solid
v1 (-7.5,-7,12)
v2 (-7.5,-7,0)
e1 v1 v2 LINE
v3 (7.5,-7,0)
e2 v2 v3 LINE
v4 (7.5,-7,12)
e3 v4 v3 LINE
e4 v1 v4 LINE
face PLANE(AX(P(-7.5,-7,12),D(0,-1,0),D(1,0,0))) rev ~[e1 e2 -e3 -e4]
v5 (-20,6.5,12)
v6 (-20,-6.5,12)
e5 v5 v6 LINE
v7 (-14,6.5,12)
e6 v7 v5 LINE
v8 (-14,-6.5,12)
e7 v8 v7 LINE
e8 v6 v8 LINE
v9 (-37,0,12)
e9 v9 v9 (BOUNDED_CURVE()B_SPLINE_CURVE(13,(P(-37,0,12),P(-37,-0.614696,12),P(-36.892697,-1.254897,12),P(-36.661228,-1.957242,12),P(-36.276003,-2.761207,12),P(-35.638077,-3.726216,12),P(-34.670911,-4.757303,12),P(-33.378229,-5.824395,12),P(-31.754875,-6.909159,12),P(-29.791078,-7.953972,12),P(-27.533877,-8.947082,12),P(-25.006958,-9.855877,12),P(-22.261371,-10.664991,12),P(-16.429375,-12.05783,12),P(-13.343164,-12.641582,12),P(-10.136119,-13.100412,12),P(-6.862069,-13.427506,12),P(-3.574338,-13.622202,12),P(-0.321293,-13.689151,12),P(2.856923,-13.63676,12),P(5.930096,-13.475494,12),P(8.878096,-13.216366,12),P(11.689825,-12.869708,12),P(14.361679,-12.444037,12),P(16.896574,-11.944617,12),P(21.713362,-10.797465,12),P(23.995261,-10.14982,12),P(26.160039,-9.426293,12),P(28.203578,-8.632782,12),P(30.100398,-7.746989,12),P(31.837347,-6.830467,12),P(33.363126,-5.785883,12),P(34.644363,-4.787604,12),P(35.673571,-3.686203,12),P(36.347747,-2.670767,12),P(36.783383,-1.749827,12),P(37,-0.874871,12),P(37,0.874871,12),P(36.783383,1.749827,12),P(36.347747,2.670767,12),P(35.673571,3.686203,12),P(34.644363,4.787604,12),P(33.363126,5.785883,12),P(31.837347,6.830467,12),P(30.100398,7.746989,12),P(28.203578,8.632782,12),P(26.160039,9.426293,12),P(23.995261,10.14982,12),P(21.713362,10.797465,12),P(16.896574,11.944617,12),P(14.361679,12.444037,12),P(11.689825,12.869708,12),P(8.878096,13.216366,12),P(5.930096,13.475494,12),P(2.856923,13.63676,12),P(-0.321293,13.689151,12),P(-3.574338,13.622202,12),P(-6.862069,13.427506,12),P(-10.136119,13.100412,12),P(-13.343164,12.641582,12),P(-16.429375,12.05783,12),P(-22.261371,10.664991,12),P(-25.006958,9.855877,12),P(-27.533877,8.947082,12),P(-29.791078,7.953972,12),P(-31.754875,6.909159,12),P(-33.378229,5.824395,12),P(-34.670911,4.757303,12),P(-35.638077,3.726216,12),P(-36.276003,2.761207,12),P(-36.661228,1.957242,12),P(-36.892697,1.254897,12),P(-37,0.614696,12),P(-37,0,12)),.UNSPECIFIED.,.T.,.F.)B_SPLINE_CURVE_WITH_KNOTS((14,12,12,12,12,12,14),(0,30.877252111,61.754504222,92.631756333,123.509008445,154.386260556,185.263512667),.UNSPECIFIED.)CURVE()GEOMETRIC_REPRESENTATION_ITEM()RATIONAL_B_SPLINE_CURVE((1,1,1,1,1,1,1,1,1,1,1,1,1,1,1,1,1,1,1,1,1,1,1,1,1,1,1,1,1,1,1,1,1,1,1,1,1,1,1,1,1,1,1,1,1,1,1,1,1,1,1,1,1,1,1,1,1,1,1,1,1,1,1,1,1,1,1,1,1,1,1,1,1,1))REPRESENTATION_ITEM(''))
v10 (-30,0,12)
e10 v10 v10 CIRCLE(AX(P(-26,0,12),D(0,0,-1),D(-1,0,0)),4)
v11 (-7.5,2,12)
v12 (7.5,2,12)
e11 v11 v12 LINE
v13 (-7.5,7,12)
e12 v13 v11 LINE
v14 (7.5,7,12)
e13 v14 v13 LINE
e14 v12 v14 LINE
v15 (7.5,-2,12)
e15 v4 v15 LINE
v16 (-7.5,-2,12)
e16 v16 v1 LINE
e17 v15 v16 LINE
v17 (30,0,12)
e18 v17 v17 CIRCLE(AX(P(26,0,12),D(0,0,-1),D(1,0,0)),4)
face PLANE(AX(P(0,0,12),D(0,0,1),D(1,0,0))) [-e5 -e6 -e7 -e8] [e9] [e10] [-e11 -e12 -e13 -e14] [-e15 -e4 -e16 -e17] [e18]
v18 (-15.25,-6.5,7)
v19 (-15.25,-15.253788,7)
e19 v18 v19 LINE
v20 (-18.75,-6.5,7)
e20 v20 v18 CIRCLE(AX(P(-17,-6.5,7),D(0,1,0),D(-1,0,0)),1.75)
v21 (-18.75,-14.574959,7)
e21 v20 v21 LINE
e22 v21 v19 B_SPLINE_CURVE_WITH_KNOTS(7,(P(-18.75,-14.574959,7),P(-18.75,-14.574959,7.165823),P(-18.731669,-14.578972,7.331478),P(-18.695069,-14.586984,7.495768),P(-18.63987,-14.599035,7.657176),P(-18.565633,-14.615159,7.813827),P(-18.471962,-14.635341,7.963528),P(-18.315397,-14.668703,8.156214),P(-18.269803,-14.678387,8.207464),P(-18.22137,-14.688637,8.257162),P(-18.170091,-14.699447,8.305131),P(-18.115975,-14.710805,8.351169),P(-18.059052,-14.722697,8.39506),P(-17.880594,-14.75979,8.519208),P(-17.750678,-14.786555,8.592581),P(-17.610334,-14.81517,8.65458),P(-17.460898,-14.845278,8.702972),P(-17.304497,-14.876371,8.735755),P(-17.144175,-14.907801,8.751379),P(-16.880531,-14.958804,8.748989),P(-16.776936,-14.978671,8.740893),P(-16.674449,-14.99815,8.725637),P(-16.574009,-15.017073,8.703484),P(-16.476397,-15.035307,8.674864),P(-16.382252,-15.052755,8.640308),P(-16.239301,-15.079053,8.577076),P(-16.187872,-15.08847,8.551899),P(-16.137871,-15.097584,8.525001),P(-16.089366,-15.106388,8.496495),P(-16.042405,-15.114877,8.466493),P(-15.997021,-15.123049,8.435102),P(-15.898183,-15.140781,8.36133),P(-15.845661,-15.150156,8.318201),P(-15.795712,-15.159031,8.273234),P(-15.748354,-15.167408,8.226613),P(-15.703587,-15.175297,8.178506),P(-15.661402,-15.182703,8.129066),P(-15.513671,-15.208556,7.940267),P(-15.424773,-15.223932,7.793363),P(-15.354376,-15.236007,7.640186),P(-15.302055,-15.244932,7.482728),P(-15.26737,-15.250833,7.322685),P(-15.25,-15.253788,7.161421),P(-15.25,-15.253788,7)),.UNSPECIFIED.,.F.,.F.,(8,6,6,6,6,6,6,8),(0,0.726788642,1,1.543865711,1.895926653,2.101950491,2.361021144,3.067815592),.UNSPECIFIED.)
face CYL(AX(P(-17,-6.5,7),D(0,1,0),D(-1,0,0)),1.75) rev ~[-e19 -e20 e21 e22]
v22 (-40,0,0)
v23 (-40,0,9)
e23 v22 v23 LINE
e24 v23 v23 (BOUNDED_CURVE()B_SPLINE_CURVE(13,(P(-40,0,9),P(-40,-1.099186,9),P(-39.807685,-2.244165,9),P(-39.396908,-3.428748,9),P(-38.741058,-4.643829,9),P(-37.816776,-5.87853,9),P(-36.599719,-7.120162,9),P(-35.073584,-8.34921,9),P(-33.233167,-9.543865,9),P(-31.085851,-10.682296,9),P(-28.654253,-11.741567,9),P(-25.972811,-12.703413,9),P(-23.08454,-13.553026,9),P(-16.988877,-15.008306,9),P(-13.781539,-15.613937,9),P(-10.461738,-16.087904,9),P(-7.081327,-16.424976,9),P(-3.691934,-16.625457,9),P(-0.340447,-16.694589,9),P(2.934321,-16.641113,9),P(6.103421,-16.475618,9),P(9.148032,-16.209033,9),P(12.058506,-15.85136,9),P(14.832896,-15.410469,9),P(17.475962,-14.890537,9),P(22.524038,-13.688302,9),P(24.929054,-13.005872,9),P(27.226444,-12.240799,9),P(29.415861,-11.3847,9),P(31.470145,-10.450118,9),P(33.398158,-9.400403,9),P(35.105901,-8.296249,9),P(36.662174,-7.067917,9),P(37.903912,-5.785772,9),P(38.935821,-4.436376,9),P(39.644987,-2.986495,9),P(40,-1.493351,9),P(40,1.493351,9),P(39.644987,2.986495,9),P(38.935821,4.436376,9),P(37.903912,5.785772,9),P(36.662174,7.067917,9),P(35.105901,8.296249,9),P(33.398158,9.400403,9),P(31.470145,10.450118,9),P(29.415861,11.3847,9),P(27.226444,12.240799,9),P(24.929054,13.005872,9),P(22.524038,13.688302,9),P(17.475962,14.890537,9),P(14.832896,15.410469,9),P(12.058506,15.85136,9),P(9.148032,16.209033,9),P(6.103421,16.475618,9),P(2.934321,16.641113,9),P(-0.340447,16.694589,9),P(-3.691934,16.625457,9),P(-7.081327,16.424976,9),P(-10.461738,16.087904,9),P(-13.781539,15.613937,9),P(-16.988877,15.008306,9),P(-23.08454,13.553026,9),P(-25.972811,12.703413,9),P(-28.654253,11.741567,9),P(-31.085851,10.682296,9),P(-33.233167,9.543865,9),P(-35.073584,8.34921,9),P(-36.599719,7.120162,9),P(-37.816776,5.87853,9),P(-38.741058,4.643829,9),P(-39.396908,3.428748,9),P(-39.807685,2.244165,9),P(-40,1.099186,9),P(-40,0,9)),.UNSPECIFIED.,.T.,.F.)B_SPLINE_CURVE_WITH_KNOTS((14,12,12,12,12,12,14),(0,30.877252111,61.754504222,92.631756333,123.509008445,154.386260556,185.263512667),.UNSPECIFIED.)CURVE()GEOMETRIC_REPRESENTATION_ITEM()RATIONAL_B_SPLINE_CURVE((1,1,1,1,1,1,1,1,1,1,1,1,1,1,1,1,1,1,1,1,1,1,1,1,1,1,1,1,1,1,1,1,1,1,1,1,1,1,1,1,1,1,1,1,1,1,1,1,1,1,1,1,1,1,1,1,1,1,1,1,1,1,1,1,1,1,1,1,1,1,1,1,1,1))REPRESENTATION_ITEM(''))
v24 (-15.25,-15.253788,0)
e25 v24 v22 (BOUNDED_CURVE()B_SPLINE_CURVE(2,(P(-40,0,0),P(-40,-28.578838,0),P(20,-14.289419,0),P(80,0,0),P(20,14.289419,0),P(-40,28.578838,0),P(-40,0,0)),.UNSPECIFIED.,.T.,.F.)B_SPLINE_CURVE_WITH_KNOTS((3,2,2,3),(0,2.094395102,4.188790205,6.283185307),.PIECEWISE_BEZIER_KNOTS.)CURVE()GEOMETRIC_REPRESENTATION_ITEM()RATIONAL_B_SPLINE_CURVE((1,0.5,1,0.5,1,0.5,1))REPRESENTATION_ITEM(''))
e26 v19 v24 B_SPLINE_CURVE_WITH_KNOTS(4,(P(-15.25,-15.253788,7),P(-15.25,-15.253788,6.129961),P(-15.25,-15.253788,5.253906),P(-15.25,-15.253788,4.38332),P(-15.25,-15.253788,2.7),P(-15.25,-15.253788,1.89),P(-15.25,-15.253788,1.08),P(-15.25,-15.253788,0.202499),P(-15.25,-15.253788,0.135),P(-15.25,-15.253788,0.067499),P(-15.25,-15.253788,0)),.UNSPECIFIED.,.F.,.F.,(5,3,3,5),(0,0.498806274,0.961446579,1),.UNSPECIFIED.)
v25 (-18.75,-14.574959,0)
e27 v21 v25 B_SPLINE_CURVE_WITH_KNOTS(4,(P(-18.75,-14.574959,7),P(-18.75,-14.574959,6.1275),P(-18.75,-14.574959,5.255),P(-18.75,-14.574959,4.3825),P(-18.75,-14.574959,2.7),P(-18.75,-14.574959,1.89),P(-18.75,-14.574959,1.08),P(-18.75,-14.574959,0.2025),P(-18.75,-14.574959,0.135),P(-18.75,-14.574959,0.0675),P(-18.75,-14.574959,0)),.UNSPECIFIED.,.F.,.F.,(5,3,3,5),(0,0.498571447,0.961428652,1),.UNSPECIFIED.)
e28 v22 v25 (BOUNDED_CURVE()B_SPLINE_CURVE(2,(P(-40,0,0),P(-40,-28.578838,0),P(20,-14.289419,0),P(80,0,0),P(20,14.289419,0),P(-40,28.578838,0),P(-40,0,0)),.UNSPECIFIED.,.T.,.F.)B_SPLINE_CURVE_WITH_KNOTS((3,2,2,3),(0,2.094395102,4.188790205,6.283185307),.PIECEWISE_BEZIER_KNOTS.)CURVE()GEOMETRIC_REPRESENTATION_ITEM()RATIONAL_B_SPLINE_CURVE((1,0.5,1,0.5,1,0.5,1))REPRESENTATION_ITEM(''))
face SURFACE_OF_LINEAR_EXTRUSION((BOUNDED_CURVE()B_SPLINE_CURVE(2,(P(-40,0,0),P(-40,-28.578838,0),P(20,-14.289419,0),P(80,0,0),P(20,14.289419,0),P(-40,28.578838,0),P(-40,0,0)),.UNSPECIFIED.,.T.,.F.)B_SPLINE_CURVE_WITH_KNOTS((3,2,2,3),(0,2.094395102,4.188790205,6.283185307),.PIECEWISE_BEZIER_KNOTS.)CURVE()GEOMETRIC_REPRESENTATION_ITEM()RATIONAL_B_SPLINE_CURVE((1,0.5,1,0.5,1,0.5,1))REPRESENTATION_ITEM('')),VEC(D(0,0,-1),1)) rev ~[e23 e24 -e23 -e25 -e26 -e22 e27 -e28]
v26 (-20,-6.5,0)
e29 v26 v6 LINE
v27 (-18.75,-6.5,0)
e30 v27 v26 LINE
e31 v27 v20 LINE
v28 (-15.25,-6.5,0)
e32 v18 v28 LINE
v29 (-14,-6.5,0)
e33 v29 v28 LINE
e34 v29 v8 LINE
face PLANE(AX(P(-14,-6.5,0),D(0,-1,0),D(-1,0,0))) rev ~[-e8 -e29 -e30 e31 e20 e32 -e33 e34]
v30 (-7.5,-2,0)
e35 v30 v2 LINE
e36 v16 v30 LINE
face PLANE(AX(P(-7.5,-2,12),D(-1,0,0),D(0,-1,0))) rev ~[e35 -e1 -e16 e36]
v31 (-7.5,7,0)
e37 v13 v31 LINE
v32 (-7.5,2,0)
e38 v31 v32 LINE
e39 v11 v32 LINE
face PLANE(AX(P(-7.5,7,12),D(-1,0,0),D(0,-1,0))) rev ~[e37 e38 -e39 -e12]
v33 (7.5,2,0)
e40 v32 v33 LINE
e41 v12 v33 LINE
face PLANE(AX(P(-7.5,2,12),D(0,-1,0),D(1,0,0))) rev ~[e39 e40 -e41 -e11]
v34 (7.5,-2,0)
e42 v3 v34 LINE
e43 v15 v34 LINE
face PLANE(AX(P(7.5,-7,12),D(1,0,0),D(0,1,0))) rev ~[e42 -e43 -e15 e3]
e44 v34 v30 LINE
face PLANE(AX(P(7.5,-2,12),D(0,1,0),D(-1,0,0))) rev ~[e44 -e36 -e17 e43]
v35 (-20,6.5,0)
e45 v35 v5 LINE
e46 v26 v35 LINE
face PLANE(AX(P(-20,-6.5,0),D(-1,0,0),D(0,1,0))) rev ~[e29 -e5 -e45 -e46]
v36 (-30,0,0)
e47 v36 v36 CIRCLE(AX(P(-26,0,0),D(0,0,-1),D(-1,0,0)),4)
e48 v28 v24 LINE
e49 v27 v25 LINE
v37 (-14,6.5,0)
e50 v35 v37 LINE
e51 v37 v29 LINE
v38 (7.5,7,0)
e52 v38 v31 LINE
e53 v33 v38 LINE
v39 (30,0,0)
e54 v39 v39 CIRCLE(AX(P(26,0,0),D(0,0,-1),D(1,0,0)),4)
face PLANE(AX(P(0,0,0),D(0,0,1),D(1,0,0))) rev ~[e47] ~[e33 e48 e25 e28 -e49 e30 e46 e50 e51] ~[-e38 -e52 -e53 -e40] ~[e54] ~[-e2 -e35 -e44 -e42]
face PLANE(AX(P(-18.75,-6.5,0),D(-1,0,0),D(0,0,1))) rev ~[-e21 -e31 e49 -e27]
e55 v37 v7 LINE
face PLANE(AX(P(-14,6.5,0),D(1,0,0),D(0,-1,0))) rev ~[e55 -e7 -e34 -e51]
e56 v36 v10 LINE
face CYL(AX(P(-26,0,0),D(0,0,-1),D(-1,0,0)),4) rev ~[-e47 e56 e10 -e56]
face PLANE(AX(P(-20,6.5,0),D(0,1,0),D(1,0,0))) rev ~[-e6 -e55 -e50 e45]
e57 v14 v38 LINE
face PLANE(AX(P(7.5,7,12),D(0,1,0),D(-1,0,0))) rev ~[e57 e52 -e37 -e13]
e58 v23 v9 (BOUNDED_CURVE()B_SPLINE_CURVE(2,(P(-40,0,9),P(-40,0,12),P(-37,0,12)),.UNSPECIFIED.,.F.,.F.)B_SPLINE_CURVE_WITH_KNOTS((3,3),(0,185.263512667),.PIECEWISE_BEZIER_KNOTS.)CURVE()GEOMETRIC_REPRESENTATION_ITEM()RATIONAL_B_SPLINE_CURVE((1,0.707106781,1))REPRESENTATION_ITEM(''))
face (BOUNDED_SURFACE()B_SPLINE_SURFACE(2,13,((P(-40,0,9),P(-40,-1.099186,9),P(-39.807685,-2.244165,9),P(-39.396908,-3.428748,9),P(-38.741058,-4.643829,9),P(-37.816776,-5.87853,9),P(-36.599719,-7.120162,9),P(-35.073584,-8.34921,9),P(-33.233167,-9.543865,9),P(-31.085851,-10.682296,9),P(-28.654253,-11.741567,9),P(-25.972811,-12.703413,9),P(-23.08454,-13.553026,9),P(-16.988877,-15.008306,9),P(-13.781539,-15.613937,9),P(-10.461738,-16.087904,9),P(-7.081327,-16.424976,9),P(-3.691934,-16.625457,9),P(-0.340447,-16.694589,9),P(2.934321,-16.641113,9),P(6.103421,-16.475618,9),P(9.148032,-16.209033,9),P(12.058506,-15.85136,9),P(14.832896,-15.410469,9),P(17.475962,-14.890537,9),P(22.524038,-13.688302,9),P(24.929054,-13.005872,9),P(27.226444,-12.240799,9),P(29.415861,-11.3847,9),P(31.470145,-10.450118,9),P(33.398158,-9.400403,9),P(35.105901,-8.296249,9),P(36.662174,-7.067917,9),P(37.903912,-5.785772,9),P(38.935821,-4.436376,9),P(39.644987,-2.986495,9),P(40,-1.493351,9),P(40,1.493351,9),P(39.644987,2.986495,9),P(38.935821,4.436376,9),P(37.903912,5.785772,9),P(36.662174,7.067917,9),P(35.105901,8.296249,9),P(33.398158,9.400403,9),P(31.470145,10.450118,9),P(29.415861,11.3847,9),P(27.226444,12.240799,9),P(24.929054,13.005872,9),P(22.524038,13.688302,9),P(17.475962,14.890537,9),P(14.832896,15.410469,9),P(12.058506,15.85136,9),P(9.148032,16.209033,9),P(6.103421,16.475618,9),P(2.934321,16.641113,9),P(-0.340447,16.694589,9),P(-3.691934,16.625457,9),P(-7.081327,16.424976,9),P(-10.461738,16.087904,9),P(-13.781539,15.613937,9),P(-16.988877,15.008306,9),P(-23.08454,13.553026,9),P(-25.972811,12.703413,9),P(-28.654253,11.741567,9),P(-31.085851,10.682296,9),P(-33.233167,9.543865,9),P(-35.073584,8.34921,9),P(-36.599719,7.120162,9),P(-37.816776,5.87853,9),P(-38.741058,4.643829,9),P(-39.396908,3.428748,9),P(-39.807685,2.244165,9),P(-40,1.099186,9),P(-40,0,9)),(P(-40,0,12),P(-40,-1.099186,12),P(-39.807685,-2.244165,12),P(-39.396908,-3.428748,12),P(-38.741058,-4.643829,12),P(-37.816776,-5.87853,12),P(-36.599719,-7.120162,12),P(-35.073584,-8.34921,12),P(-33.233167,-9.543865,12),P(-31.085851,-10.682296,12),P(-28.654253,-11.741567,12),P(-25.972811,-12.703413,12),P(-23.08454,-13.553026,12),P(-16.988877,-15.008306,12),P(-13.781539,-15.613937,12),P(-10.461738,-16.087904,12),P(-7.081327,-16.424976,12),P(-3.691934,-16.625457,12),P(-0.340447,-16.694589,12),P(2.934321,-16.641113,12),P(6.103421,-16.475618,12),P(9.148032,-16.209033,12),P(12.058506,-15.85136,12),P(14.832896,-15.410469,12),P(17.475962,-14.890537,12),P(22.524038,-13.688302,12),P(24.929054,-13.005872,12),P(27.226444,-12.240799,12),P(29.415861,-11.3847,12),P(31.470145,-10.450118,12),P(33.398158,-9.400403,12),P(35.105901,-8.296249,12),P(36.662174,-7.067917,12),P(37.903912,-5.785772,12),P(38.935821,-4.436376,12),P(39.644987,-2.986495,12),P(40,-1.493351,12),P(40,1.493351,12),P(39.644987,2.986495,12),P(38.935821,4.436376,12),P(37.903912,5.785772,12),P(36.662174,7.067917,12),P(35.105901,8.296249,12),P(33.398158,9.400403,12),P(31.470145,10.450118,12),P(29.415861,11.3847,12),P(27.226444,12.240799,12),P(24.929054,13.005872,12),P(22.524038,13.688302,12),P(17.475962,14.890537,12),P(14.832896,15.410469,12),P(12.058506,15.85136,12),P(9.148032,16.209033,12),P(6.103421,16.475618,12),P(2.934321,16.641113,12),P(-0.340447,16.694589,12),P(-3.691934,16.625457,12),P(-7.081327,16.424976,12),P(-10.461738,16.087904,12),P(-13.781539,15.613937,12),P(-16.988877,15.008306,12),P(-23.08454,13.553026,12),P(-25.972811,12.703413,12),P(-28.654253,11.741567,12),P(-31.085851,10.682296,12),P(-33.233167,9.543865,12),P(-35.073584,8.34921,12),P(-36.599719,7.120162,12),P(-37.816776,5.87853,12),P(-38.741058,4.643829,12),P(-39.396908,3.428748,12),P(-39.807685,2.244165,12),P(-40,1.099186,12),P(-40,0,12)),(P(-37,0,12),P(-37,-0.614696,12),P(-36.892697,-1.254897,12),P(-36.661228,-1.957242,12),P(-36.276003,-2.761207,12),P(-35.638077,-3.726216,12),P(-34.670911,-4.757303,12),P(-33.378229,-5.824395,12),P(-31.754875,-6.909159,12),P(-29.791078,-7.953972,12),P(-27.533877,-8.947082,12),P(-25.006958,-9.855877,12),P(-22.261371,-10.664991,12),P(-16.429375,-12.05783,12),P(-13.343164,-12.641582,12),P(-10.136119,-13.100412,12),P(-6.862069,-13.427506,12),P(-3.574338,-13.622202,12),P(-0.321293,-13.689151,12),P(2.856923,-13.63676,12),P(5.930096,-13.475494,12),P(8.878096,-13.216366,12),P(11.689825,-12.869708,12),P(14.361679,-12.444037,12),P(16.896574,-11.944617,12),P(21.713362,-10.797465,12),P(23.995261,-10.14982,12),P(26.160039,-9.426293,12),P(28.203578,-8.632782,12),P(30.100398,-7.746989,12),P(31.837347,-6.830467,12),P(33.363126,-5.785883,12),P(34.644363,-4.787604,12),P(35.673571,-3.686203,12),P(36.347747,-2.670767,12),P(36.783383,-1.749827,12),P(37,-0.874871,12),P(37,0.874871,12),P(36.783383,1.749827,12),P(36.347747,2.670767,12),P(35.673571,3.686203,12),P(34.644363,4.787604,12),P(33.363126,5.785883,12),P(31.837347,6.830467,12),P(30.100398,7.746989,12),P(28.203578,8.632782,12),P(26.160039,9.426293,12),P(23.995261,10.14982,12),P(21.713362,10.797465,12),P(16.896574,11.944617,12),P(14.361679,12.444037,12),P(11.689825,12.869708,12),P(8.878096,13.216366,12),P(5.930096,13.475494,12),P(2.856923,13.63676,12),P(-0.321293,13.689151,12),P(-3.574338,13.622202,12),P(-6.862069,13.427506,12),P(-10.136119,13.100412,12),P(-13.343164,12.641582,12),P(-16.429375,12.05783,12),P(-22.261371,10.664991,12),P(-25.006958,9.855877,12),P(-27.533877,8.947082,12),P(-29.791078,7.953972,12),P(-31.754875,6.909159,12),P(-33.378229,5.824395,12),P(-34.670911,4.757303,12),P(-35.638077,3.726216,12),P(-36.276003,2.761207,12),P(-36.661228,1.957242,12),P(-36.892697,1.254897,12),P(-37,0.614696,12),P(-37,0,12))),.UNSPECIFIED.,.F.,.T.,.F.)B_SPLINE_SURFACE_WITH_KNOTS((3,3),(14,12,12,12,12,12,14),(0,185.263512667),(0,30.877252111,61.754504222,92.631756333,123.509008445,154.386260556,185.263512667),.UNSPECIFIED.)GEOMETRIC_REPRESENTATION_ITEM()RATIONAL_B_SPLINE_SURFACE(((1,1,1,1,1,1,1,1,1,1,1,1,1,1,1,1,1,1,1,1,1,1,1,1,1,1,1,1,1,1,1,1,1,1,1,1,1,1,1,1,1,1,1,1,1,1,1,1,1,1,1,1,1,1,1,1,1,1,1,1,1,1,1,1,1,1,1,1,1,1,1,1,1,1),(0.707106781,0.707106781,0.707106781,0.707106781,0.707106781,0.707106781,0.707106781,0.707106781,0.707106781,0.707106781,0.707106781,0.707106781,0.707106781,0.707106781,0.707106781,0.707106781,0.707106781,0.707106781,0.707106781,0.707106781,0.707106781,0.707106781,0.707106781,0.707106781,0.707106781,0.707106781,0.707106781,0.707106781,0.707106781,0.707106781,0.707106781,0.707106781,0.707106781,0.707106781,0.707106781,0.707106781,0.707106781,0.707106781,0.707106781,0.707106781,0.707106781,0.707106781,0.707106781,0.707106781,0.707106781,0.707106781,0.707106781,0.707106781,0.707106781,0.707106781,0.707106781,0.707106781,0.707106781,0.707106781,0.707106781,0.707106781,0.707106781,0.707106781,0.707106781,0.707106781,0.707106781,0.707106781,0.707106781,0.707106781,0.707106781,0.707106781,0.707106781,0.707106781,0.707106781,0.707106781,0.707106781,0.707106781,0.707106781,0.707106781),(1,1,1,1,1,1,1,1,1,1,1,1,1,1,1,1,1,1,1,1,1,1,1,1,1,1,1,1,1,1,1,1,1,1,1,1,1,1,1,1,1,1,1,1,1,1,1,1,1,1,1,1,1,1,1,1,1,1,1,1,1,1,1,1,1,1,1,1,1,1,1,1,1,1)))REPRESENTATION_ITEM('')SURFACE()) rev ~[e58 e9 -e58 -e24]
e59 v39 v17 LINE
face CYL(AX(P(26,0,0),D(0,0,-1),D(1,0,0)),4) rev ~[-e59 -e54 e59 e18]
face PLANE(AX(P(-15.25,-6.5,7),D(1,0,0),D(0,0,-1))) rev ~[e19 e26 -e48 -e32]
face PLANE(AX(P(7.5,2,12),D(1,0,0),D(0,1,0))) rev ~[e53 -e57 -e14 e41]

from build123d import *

# Parameters (mm, degrees)
F1_DEPTH = 12
F2_R     = 3
F4_DEPTH = 12.0010001
F5_R     = 4
F6_DEPTH = 53.1
F8_DEPTH = 25


# Not quite as in the source:
# - a feature names something its author has since deleted; it is built from what else it names


with BuildPart() as f1:
    # F0 (on Top) → F1 (new body)
    with BuildSketch(Plane.XY):
        with BuildLine():
            add(Edge.make_bspline(
                [(-40, 0), (-40, -28.5788383249), (20, -14.2894191624), (80, 0), (20, 14.2894191624), (-40, 28.5788383249), (-40, 0)],
                knots=[0, 0, 0, 2.0943951024, 2.0943951024, 4.1887902048, 4.1887902048, 6.2831853072, 6.2831853072, 6.2831853072], degree=2, weights=[1, 0.5, 1, 0.5, 1, 0.5, 1]))
        make_face()
    extrude(amount=F1_DEPTH)

    # F2
    f2_edges = [f1.edges().sort_by_distance(p)[0] for p in [
        (40, -3.8e-05, 12),
    ]]
    fillet(f2_edges, radius=F2_R)

    # F3 (on face) → F4 (cut, through all)
    with BuildSketch(Plane.XY.offset(12)):
        Polygon((7.5, -2), (0, -2), (-7.5, -2), (-7.5, -7), (7.5, -7), align=None)
        Polygon((-7.5, 2), (0, 2), (7.5, 2), (7.5, 7), (-7.5, 7), align=None)
    extrude(amount=-F4_DEPTH, mode=Mode.SUBTRACT)

    # F5 (on face) → F6 (cut)
    with BuildSketch(Plane(origin=(0, 0, 0), x_dir=(1, 0, 0), z_dir=(0, 0, -1))):
        with BuildLine():
            ThreePointArc((-22, 0), (-26, 4), (-30, 0))
            Line((-30, 0), (-26, 0))
            Line((-26, 0), (-22, 0))
        make_face()
        Polygon((-20, 6.5), (-20, 0), (-20, -6.5), (-14, -6.5), (-14, 6.5), align=None)
        with BuildLine():
            Line((-26, 0), (-30, 0))
            ThreePointArc((-30, 0), (-26, -4), (-22, 0))
            Line((-22, 0), (-26, 0))
        make_face()
        with Locations((26, 0)):
            Circle(F5_R)
    extrude(amount=-F6_DEPTH, mode=Mode.SUBTRACT)

    # F7 (on face) → F8 (cut)
    with BuildSketch(Plane(origin=(0, -6.5, 0), x_dir=(-1, 0, 0), z_dir=(0, 1, 0))):
        with BuildLine():
            Line((15.25, 0), (17, 0))
            Line((17, 0), (17, 5.25))
            ThreePointArc((17, 5.25), (15.7625631329, 5.7625631329), (15.25, 7))
            Line((15.25, 7), (15.25, 0))
        make_face()
        with BuildLine():
            Line((17, 5.25), (17, 0))
            Line((17, 0), (18.75, 0))
            Line((18.75, 0), (18.75, 7))
            ThreePointArc((18.75, 7), (18.2374368671, 5.7625631329), (17, 5.25))
        make_face()
        with BuildLine():
            ThreePointArc((15.25, 7), (15.7625631329, 5.7625631329), (17, 5.25))
            ThreePointArc((17, 5.25), (18.2374368671, 5.7625631329), (18.75, 7))
            ThreePointArc((18.75, 7), (17, 8.75), (15.25, 7))
        make_face()
    extrude(amount=-F8_DEPTH, mode=Mode.SUBTRACT)


solid = f1.part
